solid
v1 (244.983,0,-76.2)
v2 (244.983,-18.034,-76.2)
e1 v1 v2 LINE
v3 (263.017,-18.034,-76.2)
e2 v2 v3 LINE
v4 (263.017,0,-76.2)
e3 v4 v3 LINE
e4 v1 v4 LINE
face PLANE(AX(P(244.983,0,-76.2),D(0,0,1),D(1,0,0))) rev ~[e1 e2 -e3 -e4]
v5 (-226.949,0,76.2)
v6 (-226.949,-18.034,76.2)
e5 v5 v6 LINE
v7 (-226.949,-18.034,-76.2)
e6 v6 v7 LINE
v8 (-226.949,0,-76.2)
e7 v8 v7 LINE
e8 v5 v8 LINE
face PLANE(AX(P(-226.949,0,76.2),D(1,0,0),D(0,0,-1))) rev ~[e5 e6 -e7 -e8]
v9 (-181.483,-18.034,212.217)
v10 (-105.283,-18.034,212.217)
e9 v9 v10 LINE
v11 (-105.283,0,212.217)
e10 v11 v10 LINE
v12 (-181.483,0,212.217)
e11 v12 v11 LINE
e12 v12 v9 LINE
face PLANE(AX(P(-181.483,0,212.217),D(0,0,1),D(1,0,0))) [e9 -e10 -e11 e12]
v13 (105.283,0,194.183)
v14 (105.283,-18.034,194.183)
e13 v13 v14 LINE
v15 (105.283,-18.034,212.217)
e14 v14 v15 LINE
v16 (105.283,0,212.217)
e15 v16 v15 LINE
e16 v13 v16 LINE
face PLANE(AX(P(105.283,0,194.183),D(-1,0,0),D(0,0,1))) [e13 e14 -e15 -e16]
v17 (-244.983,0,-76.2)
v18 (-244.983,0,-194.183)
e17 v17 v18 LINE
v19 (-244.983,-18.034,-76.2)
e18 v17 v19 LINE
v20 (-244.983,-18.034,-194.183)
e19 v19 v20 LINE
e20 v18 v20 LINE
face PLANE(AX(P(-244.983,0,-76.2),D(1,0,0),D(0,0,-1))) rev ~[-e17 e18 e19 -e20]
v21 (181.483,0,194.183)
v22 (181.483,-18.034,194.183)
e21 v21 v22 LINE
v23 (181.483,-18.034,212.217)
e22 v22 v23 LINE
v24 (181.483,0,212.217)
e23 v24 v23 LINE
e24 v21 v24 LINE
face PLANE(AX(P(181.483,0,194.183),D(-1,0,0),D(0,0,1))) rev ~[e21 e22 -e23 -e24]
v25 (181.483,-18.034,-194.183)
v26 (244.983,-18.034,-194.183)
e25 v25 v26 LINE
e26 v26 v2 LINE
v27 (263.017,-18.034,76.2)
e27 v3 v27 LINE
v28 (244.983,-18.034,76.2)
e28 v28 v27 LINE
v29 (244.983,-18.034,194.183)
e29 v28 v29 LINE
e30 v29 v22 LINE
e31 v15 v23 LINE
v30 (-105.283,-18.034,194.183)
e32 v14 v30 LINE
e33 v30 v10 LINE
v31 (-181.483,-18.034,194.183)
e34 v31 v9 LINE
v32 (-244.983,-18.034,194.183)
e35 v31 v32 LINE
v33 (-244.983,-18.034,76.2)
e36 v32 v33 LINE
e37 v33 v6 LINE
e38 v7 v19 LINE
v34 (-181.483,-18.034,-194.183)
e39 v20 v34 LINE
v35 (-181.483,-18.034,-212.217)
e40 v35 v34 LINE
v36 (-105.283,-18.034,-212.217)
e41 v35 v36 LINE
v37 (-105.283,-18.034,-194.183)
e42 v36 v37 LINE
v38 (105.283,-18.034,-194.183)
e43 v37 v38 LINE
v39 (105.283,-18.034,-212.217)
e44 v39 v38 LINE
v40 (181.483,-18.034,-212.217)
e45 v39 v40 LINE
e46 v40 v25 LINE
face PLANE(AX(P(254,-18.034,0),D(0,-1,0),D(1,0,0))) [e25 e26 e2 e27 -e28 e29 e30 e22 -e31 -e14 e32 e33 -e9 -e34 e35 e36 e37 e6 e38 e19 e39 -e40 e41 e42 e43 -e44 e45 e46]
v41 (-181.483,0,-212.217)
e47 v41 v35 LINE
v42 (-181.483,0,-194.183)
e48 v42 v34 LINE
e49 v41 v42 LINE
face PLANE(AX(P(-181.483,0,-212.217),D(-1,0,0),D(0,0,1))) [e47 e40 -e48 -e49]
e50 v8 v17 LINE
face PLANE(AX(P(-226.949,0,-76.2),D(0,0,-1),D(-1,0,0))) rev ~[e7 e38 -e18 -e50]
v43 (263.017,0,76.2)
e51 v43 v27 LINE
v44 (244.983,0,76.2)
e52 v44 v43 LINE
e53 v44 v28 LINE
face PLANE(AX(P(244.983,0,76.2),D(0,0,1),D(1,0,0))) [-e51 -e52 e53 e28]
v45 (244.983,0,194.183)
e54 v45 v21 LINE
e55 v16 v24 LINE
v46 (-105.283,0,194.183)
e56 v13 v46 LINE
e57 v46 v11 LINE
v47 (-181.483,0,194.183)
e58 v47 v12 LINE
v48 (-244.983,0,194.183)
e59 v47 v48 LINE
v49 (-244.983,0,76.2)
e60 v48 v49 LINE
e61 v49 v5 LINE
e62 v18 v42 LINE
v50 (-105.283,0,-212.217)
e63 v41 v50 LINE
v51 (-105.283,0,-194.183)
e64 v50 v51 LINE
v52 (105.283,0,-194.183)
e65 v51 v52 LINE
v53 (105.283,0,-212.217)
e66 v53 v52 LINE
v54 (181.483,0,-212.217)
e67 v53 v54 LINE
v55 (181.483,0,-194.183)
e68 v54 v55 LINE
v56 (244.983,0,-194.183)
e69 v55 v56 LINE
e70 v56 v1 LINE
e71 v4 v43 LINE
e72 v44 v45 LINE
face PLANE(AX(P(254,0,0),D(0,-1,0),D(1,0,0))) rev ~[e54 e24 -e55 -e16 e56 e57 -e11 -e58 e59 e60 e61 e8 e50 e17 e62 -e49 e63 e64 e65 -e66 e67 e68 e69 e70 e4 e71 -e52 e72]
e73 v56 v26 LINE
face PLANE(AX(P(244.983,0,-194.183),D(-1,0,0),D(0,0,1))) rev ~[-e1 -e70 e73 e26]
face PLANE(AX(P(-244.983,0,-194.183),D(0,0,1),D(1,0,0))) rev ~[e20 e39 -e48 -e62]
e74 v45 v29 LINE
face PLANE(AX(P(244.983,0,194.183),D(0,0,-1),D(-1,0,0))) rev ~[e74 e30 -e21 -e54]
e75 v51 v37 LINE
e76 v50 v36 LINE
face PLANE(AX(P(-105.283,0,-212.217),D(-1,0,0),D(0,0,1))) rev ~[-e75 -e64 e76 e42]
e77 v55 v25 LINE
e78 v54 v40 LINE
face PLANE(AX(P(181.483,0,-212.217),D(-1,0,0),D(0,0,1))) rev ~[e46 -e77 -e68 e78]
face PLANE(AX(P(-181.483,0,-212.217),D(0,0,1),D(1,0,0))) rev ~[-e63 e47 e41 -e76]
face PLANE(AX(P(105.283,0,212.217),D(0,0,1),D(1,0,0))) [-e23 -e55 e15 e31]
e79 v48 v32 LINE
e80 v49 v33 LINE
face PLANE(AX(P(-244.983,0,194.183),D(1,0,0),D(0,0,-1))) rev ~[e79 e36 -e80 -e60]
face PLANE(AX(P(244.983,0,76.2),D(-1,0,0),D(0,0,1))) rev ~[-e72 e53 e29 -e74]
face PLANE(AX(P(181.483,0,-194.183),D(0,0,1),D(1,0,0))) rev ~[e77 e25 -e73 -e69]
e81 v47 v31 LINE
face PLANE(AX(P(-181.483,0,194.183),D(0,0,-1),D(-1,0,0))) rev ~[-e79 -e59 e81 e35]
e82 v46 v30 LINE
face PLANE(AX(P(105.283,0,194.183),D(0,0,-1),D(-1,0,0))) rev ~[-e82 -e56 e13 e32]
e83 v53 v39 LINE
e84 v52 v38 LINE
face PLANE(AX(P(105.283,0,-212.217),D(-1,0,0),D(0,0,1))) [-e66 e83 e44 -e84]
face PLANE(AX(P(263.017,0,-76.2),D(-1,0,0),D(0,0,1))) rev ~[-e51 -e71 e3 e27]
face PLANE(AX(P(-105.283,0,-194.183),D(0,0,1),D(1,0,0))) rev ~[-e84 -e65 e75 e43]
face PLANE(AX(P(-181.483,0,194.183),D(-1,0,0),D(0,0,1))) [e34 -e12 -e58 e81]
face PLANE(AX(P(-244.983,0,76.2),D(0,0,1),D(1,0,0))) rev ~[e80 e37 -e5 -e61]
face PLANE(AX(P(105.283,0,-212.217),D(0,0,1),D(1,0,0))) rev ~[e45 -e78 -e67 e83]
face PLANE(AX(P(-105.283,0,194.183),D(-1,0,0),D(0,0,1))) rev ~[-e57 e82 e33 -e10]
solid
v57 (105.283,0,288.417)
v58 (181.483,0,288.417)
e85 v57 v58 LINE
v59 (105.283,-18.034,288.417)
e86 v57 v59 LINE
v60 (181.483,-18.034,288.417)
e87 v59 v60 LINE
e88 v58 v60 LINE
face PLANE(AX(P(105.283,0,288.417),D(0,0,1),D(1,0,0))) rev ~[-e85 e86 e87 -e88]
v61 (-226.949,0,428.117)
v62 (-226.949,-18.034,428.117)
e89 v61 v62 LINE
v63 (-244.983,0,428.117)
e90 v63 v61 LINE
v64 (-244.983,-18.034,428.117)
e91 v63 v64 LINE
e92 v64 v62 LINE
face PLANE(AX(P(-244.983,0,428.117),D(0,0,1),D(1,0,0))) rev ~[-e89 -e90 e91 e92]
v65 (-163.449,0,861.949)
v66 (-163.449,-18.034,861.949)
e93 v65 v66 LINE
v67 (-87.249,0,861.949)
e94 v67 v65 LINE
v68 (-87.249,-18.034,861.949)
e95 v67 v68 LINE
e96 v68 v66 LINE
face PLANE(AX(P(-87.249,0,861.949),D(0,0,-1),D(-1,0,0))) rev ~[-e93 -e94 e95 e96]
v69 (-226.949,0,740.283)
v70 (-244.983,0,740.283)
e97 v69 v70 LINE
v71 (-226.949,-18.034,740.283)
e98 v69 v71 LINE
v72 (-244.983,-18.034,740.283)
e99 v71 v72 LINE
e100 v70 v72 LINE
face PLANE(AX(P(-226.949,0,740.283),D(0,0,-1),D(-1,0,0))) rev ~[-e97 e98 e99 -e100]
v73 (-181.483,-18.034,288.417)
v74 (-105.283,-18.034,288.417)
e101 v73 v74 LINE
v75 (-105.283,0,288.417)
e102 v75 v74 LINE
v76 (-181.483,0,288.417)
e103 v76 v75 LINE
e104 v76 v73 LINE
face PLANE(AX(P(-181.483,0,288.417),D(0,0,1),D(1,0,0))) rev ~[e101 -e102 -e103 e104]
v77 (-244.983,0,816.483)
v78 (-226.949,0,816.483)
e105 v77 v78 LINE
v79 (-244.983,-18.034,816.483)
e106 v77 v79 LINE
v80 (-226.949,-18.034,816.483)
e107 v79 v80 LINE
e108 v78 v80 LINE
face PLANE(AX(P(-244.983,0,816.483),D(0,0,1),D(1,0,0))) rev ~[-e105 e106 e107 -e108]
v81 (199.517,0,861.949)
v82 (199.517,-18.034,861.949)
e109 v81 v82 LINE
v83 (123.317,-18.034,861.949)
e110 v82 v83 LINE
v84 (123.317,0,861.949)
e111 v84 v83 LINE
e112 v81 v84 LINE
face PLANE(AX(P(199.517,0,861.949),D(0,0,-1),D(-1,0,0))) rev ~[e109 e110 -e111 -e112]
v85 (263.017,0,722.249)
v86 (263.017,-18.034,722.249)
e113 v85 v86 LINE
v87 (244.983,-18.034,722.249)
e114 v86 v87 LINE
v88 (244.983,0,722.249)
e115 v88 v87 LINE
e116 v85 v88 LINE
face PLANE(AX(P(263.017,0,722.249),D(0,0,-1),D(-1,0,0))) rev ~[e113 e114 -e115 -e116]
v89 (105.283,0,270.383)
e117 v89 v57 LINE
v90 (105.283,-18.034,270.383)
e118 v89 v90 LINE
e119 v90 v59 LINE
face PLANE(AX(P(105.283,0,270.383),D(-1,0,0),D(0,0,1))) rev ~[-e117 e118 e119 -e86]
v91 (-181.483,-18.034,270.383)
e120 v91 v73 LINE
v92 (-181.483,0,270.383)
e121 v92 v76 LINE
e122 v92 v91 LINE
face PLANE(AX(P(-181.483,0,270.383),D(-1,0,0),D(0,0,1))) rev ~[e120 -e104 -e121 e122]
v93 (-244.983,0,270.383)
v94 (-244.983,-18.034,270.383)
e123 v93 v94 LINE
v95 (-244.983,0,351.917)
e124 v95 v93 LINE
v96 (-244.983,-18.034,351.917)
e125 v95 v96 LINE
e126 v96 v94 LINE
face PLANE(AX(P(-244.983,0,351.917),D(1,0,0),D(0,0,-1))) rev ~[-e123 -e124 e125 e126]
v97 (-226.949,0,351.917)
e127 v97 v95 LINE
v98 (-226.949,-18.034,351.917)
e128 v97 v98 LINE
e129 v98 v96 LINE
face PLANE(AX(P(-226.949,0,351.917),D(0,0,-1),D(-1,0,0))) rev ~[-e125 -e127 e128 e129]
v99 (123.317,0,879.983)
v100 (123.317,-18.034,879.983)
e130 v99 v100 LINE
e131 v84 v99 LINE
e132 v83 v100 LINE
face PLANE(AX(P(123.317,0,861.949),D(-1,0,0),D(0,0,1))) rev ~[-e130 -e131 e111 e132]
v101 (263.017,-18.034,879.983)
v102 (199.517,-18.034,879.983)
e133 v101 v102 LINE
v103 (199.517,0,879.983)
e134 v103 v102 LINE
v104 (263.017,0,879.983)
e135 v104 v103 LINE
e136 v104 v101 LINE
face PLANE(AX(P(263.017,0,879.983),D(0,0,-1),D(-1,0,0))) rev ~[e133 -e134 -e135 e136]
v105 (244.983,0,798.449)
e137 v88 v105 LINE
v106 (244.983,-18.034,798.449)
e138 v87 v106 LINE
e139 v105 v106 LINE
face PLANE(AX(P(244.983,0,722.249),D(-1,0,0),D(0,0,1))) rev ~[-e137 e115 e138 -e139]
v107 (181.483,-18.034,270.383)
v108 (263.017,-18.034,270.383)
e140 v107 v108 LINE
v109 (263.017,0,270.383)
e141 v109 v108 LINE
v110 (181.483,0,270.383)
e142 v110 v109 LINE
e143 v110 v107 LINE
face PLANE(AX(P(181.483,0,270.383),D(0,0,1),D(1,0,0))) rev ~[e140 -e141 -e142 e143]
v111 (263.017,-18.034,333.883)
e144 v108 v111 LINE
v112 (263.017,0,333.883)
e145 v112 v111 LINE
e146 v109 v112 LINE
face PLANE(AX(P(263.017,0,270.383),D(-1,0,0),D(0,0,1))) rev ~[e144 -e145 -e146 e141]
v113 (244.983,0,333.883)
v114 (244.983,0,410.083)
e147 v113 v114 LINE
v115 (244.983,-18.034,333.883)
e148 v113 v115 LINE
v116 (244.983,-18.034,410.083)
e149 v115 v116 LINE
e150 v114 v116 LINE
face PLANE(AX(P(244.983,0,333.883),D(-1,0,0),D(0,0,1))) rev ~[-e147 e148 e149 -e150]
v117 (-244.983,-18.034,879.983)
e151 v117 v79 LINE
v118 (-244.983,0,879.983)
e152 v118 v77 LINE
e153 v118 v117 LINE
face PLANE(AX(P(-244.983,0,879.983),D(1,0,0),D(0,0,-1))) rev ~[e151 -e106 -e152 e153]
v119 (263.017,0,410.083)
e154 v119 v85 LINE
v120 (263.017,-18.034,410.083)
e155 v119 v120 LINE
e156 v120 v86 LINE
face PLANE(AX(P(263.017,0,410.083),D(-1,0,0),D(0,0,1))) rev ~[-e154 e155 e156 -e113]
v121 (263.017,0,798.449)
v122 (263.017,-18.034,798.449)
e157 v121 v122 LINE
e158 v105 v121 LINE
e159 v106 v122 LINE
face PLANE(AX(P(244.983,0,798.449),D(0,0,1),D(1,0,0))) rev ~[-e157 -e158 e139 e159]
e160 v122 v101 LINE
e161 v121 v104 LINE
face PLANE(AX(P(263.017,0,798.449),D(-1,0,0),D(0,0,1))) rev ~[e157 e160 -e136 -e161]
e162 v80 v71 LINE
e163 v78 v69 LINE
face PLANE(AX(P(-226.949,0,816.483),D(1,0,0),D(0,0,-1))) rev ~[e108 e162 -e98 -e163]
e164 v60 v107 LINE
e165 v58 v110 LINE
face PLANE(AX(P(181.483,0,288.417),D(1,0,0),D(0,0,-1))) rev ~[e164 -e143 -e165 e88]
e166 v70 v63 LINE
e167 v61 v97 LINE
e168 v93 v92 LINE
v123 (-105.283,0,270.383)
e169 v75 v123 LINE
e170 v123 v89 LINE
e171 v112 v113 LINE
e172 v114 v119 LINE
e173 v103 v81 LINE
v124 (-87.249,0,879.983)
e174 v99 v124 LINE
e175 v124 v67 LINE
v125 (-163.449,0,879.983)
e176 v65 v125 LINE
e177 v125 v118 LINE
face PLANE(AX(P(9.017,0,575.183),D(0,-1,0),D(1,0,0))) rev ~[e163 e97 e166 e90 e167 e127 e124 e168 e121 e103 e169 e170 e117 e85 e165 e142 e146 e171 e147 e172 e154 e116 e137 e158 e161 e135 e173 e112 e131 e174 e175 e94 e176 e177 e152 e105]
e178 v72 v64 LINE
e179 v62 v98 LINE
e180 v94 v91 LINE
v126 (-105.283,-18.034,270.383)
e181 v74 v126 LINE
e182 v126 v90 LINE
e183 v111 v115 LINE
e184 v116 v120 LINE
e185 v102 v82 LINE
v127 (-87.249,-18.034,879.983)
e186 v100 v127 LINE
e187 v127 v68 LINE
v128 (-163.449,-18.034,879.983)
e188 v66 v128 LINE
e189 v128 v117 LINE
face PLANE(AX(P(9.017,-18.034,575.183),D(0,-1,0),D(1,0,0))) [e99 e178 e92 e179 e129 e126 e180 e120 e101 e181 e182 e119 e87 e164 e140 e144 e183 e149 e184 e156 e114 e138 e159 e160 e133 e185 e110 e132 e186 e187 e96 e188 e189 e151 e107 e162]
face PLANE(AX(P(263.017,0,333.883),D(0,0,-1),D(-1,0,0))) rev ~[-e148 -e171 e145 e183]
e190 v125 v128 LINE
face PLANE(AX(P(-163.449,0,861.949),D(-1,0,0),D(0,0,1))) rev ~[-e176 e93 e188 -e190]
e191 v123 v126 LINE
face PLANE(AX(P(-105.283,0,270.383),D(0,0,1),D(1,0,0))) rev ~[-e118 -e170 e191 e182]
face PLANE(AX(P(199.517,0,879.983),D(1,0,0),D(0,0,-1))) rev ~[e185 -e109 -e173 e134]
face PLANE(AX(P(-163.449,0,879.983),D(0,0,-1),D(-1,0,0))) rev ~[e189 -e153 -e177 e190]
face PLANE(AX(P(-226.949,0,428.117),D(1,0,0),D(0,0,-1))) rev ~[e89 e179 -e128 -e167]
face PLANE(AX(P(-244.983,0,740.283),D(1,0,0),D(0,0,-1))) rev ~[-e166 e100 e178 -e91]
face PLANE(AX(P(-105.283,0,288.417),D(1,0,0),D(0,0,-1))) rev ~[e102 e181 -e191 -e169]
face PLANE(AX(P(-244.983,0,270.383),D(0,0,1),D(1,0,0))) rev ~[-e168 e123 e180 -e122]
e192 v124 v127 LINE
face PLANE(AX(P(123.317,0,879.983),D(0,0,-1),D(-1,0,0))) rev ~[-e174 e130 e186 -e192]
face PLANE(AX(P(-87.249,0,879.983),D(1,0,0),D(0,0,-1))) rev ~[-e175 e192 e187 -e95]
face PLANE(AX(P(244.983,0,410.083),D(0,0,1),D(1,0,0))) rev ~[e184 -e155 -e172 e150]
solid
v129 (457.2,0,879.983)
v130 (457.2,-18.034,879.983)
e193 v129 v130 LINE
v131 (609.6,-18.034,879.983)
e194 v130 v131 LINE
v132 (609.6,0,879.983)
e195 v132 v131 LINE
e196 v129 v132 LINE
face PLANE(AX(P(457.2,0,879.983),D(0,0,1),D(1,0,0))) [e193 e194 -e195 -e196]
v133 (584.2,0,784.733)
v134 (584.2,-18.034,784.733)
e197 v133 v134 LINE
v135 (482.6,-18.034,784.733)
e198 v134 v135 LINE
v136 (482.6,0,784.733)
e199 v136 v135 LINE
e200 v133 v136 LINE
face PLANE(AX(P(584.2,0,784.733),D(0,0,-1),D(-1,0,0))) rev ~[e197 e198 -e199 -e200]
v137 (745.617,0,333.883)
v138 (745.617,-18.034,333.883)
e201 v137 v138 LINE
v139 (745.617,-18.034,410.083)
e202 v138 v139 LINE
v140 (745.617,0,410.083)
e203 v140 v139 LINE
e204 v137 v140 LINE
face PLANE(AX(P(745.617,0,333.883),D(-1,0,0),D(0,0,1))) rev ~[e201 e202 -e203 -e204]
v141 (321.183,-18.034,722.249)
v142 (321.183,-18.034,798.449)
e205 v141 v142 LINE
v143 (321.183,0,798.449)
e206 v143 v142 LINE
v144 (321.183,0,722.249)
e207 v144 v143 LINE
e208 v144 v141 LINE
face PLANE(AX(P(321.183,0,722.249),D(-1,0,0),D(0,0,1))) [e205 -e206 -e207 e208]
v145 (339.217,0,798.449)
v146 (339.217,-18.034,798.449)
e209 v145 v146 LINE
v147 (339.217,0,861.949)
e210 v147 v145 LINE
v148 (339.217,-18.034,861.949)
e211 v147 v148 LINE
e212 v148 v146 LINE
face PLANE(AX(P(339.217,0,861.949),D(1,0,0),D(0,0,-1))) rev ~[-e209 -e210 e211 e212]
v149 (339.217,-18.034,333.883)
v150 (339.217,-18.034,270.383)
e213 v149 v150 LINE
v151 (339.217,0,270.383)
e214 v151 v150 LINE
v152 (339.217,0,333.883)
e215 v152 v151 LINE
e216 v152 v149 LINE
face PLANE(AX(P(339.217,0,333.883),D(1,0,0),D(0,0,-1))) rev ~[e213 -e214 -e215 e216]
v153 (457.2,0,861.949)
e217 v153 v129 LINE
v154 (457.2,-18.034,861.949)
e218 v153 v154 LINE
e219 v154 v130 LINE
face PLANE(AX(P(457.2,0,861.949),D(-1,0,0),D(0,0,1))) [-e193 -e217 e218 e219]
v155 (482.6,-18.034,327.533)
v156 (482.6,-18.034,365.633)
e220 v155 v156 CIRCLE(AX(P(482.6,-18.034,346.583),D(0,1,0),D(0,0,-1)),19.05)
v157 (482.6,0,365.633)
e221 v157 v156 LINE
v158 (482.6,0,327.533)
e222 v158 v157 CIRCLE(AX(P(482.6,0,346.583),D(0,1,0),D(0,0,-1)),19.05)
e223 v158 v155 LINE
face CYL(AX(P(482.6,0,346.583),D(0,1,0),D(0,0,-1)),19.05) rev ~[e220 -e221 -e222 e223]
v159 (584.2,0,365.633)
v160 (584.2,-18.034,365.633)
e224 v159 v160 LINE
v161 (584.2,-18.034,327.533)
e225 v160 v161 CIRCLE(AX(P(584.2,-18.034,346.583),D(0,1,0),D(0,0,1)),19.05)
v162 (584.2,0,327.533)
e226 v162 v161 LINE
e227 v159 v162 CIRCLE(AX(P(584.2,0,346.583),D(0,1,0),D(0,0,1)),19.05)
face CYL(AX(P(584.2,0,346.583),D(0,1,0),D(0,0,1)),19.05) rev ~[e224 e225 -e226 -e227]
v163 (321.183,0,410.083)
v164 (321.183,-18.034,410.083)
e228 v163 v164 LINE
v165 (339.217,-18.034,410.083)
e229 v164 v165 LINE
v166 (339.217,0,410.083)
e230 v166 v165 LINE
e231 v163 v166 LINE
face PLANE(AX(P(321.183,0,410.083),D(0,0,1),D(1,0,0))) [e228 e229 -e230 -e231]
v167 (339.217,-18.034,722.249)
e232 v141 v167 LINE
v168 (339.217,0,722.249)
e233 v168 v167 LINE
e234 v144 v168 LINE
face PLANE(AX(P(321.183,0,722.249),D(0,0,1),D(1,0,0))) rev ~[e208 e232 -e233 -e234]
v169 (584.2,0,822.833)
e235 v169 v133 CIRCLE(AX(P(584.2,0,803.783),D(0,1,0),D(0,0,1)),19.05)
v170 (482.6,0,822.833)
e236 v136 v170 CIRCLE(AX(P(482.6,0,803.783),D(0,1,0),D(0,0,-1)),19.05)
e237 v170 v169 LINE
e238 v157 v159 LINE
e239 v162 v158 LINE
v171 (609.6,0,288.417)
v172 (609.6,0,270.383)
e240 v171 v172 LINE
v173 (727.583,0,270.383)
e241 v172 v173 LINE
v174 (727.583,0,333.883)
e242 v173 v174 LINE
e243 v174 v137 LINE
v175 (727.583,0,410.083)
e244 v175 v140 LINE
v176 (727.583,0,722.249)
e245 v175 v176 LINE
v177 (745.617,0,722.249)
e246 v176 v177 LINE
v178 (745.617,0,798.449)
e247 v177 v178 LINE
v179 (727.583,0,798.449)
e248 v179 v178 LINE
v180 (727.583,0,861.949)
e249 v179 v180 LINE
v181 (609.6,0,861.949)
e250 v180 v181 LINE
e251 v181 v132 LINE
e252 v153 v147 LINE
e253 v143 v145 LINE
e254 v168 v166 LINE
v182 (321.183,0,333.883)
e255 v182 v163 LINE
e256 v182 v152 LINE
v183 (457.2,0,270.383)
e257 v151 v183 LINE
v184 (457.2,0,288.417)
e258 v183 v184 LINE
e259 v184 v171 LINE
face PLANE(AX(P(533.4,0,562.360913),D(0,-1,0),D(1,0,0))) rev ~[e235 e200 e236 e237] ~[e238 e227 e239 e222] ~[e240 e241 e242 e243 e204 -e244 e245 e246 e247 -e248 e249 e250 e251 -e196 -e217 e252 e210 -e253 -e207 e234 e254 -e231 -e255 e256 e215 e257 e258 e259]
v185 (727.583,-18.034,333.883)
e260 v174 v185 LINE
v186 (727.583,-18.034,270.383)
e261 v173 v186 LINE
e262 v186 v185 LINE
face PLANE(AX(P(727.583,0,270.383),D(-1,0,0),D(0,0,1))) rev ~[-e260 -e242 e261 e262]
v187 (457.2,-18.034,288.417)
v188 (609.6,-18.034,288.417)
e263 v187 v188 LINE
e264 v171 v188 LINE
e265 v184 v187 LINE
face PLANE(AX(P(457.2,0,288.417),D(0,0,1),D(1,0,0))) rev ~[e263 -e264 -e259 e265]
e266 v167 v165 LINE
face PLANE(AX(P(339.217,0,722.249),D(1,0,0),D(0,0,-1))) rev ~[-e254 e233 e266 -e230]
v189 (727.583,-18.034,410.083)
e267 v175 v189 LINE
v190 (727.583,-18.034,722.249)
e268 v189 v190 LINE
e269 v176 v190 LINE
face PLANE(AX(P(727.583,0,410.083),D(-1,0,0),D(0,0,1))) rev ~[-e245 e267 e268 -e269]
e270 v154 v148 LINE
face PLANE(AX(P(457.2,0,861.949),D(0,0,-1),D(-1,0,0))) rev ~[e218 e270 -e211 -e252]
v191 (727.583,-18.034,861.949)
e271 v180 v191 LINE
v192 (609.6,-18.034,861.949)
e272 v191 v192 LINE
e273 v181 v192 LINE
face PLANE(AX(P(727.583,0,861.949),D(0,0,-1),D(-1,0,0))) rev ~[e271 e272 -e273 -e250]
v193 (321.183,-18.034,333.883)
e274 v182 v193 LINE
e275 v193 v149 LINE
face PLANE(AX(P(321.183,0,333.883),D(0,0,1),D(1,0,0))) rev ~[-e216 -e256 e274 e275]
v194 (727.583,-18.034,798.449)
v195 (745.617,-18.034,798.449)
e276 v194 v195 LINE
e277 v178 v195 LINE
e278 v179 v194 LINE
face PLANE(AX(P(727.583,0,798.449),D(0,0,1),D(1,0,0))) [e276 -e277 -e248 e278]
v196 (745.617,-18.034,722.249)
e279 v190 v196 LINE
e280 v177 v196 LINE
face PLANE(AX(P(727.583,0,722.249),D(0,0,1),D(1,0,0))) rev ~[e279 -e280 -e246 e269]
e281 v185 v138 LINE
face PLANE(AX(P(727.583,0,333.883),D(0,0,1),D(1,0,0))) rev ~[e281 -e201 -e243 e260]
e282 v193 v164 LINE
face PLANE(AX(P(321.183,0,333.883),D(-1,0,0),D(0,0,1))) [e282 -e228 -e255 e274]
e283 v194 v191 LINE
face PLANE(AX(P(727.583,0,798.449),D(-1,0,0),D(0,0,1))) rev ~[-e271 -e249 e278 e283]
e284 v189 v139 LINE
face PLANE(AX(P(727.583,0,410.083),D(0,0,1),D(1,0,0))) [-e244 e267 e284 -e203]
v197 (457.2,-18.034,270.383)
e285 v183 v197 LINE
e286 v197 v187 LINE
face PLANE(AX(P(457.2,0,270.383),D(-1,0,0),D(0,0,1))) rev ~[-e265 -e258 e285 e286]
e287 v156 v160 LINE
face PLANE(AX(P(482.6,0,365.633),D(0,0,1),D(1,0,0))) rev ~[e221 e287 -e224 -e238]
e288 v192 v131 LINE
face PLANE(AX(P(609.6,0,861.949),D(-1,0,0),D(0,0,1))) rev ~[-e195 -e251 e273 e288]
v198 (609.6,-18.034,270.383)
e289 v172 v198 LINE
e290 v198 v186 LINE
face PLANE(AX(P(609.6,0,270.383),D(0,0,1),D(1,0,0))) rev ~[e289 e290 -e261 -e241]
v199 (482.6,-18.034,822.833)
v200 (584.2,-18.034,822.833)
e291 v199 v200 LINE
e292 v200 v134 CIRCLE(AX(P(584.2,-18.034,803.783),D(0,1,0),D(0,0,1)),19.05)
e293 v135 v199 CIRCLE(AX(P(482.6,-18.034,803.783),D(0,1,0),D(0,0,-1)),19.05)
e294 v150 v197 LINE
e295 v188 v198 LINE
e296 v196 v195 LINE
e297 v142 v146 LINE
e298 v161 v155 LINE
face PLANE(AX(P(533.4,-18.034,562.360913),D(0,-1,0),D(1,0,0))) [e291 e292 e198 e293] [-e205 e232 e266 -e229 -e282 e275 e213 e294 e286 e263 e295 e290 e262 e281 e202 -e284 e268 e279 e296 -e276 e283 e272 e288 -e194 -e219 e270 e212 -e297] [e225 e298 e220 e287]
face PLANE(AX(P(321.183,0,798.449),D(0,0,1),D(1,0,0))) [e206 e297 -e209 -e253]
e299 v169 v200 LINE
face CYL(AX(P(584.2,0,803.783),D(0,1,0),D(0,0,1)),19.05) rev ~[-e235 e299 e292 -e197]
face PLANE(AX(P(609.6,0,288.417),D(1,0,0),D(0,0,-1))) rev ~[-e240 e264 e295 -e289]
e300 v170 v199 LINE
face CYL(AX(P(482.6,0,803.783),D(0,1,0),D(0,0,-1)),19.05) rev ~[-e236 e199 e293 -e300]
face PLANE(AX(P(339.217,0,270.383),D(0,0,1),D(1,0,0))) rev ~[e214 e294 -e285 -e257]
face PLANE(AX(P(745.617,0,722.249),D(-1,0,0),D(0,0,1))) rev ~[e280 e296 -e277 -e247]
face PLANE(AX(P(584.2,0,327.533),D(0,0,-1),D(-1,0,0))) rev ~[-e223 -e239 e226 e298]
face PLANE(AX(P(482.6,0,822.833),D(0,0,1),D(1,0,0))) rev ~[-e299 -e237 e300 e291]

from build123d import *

# Parameters (mm, degrees)
F1_W     = 18.034
F1_H     = 152.4
F1_W_2   = 76.2
F1_H_2   = 18.034
F2_DEPTH = 18.034
F1_W_3   = 152.4
F1_H_3   = 76.2


# Not quite as in the source:
# - a variable given as a bare number and used for a length is read in inches; the dataset says mm whatever the document's units were
# - a feature names something its author has since deleted; it is built from what else it names


with BuildPart() as f2:
    # F1 (on Front) → F2 (new body)
    with BuildSketch(Plane.XZ):
        with Locations((254, 0)):
            Rectangle(F1_W, F1_H)
        with Locations((-143.383, 203.2)):
            Rectangle(F1_W_2, F1_H_2)
        with Locations((143.383, 203.2)):
            Rectangle(F1_W_2, F1_H_2)
        Polygon((-181.483, 194.183), (-244.983, 194.183), (-244.983, 76.2), (-226.949, 76.2), (-226.949, -76.2), (-244.983, -76.2), (-244.983, -194.183), (-181.483, -194.183), (-105.283, -194.183), (105.283, -194.183), (181.483, -194.183), (244.983, -194.183), (244.983, -76.2), (244.983, 76.2), (244.983, 194.183), (181.483, 194.183), (105.283, 194.183), (-105.283, 194.183), align=None)
        with Locations((-143.383, -203.2)):
            Rectangle(F1_W_2, F1_H_2)
        with Locations((143.383, -203.2)):
            Rectangle(F1_W_2, F1_H_2)
    extrude(amount=F2_DEPTH)


with BuildPart() as f2b:
    # F1 (on Front) → F2, piece 2 (new body)
    with BuildSketch(Plane.XZ):
        Polygon((-244.983, 351.917), (-244.983, 270.383), (-181.483, 270.383), (-181.483, 288.417), (-105.283, 288.417), (-105.283, 270.383), (105.283, 270.383), (105.283, 288.417), (181.483, 288.417), (181.483, 270.383), (263.017, 270.383), (263.017, 333.883), (244.983, 333.883), (244.983, 410.083), (263.017, 410.083), (263.017, 722.249), (244.983, 722.249), (244.983, 798.449), (263.017, 798.449), (263.017, 879.983), (199.517, 879.983), (199.517, 861.949), (123.317, 861.949), (123.317, 879.983), (-87.249, 879.983), (-87.249, 861.949), (-163.449, 861.949), (-163.449, 879.983), (-244.983, 879.983), (-244.983, 816.483), (-226.949, 816.483), (-226.949, 740.283), (-244.983, 740.283), (-244.983, 428.117), (-226.949, 428.117), (-226.949, 351.917), align=None)
    extrude(amount=F2_DEPTH)


with BuildPart() as f2c:
    # F1 (on Front) → F2, piece 3 (new body)
    with BuildSketch(Plane.XZ):
        Polygon((339.217, 333.883), (339.217, 270.383), (457.2, 270.383), (457.2, 288.417), (609.6, 288.417), (609.6, 270.383), (727.583, 270.383), (727.583, 333.883), (727.583, 410.083), (727.583, 722.249), (727.583, 798.449), (727.583, 861.949), (609.6, 861.949), (457.2, 861.949), (339.217, 861.949), (339.217, 798.449), (339.217, 722.249), (339.217, 410.083), align=None)
        with BuildLine():
            Line((533.4, 365.633), (584.2, 365.633))
            ThreePointArc((584.2, 365.633), (603.25, 346.583), (584.2, 327.533))
            Line((584.2, 327.533), (533.4, 327.533))
            Line((533.4, 327.533), (482.6, 327.533))
            ThreePointArc((482.6, 327.533), (463.55, 346.583), (482.6, 365.633))
            Line((482.6, 365.633), (533.4, 365.633))
        make_face(mode=Mode.SUBTRACT)
        with BuildLine():
            Line((482.6, 822.833), (533.4, 822.833))
            Line((533.4, 822.833), (584.2, 822.833))
            ThreePointArc((584.2, 822.833), (603.25, 803.783), (584.2, 784.733))
            Line((584.2, 784.733), (533.4, 784.733))
            Line((533.4, 784.733), (482.6, 784.733))
            ThreePointArc((482.6, 784.733), (463.55, 803.783), (482.6, 822.833))
        make_face(mode=Mode.SUBTRACT)
        with Locations((533.4, 870.966)):
            Rectangle(F1_W_3, F1_H_2)
        with Locations((330.2, 760.349)):
            Rectangle(F1_W, F1_H_3)
        with Locations((330.2, 371.983)):
            Rectangle(F1_W, F1_H_3)
        with Locations((736.6, 760.349)):
            Rectangle(F1_W, F1_H_3)
        with Locations((736.6, 371.983)):
            Rectangle(F1_W, F1_H_3)
    extrude(amount=F2_DEPTH)


solid = Compound([f2.part, f2b.part, f2c.part])
